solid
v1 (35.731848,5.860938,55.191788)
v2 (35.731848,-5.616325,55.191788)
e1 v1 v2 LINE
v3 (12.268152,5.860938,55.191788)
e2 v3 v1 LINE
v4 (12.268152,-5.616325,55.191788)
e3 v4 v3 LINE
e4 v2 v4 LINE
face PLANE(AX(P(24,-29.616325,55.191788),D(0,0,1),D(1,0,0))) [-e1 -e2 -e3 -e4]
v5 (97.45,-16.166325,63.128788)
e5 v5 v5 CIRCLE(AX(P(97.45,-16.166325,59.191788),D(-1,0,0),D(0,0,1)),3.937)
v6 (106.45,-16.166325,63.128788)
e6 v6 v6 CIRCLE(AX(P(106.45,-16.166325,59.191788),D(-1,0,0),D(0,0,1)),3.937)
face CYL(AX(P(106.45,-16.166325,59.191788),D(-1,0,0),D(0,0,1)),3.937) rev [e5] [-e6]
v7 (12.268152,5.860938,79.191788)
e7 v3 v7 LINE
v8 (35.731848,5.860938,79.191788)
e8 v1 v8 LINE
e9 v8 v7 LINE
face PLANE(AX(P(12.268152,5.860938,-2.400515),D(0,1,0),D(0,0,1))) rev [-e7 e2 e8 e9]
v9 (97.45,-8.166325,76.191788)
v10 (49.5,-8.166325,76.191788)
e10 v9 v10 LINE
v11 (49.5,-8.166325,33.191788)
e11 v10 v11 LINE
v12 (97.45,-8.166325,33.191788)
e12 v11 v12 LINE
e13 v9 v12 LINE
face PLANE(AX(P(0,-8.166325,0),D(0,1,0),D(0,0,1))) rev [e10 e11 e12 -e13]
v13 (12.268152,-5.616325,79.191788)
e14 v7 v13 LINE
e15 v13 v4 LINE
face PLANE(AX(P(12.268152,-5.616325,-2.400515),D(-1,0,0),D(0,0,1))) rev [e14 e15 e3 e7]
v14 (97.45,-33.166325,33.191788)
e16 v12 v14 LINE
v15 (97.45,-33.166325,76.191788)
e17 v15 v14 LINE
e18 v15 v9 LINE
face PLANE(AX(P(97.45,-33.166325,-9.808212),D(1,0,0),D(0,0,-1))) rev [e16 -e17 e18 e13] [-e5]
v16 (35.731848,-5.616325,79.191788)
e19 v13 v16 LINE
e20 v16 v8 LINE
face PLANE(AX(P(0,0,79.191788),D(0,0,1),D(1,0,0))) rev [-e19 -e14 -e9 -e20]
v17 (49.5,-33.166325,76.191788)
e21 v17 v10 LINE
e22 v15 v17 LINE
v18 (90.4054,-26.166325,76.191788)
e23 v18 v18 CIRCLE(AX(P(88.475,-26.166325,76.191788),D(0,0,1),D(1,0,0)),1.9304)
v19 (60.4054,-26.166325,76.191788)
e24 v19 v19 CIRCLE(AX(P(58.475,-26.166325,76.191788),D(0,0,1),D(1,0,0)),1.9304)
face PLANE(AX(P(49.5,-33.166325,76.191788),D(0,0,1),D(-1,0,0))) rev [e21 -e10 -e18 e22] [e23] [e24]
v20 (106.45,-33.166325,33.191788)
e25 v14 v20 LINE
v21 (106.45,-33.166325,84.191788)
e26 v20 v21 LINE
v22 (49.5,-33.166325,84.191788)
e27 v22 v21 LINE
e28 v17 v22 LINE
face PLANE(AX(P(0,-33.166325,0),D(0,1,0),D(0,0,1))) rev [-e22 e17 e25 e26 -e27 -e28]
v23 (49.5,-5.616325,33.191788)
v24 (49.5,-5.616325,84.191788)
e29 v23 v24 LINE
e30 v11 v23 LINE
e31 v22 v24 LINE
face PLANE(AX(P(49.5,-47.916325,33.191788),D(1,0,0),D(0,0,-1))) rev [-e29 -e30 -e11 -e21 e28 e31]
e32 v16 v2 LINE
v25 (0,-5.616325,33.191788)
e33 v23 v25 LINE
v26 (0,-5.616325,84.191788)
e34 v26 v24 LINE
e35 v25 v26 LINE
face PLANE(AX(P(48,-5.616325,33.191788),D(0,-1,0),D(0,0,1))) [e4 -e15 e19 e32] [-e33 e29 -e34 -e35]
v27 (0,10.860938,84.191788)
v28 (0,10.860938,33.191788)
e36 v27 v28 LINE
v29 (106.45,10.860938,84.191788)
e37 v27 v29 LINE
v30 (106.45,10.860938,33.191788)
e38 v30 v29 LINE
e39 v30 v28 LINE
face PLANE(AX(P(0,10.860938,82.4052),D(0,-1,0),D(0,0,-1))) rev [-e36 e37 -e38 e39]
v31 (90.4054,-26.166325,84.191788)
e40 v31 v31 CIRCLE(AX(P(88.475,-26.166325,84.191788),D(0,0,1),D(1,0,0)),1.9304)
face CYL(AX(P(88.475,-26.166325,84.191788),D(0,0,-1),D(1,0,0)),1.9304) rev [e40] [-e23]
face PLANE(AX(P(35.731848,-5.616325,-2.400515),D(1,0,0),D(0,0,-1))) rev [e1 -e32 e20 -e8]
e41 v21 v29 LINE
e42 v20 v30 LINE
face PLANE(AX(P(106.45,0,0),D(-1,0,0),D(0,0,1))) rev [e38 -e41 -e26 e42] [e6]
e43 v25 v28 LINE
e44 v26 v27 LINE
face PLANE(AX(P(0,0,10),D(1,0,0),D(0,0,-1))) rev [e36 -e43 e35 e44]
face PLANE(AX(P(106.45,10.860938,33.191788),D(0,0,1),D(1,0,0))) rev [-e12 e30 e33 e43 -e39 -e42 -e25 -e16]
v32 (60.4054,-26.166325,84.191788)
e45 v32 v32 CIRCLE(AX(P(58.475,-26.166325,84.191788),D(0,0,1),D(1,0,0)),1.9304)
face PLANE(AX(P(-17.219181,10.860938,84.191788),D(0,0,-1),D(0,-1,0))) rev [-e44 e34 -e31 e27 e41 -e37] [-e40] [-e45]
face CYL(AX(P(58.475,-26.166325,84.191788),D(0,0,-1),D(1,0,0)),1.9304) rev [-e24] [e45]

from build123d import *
from build123d.topology import SkipClean

# Parameters (mm, degrees)
SKETCH1_W             = 48
SKETCH1_H             = 53
BOSS_EXTRUDE1_DEPTH   = 10
SKETCH2_W             = 48
SKETCH2_H             = 5.616325
BOSS_EXTRUDE2_DEPTH   = 33.1917878
SKETCH4_W             = 4
SKETCH4_H             = 10
BOSS_EXTRUDE4_DEPTH   = 40
SKETCH5_W             = 48
SKETCH5_H             = 10.8609375
BOSS_EXTRUDE5_DEPTH   = 23.1917878
SKETCH6_W             = 48
SKETCH6_H             = 5
BOSS_EXTRUDE6_DEPTH   = 42.3
SKETCH7_W             = 12.8082122
SKETCH7_H             = 16.4772625
BOSS_EXTRUDE7_DEPTH   = 48
CUT_EXTRUDE1_REACH    = 84.426
SKETCH8_R             = 11.5
SKETCH8_R_2           = 2
FILLET1_R             = 10
FILLET2_R             = 4
SKETCH9_W             = 5
SKETCH9_H             = 16.4772625
BOSS_EXTRUDE9_DEPTH   = 48
CUT_EXTRUDE2_DEPTH    = 88.252507127
SKETCH11_W            = 51
SKETCH11_H            = 16.4772625
BOSS_EXTRUDE10_DEPTH  = 49.45
BOSS_EXTRUDE11_DEPTH  = 46
SKETCH16_W            = 47.95
SKETCH16_H            = 51
BOSS_EXTRUDE14_DEPTH  = 2.55
SKETCH14_W            = 5
SKETCH14_H            = 42.3
BOSS_EXTRUDE13_DEPTH  = 1.5
SKETCH17_W            = 51
SKETCH17_H            = 19.0272625
BOSS_EXTRUDE15_DEPTH  = 9
BOSS_EXTRUDE16_DEPTH  = 25
SKETCH19_R            = 1.9304
CUT_EXTRUDE3_DEPTH    = 125.404890183
MIRROR2_START         = 33.1917878
MIRROR2_DEPTH         = 51
MIRROR2_START_2       = 76.1917878
MIRROR2_2_OUTLINE_W   = 47.95
MIRROR2_2_OUTLINE_H   = 25
MIRROR2_2_OUTLINE_R   = 1.9304
MIRROR2_2_DEPTH       = 8
MIRROR2_3_OUTLINE_W   = 45
MIRROR2_3_OUTLINE_H   = 42.3
MIRROR2_3_OUTLINE_R   = 2
MIRROR2_3_OUTLINE_R_2 = 11.5
MIRROR2_3_DEPTH       = 5
SKETCH20_W            = 103.287975037
SKETCH20_H            = 97.84889924
CUT_EXTRUDE4_DEPTH    = 144.929961559
SKETCH21_W            = 49.5
SKETCH21_H            = 42.3
CUT_EXTRUDE5_DEPTH    = 128.391431036
SKETCH24_R            = 7.5
BOSS_EXTRUDE18_DEPTH  = 45
BOSS_EXTRUDE19_DEPTH  = 29
SKETCH26_R            = 3.937
CUT_EXTRUDE6_DEPTH    = 135.023808387
CUT_EXTRUDE7_DEPTH    = 24
CUT_EXTRUDE8_DEPTH    = 135.852601315
CUT_EXTRUDE9_REACH    = 125.734


# Read off the part's stored shape, not the designer's step: Mirror2
with BuildPart() as part:
    # Sketch1 → Boss-Extrude1 (new body)
    with BuildSketch(Plane.XY):
        with Locations((24, 26.5)):
            Rectangle(SKETCH1_W, SKETCH1_H)
    extrude(amount=BOSS_EXTRUDE1_DEPTH)

    # Sketch2 → Boss-Extrude2 (add)
    with BuildSketch(Plane(origin=(0, 0, 0), x_dir=(-1, 0, 0), z_dir=(0, 0, -1))):
        with Locations((-24, -2.8081625)):
            Rectangle(SKETCH2_W, SKETCH2_H)
    extrude(amount=-BOSS_EXTRUDE2_DEPTH)

    # Sketch4 → Boss-Extrude4 (add)
    with BuildSketch(Plane.XY.offset(10)):
        with Locations((2, 48)):
            Rectangle(SKETCH4_W, SKETCH4_H)
        with Locations((46, 48)):
            Rectangle(SKETCH4_W, SKETCH4_H)
    extrude(amount=BOSS_EXTRUDE4_DEPTH)

    # Sketch5 → Boss-Extrude5 (add)
    with BuildSketch(Plane.XY.offset(10)):
        with Locations((24, 5.43046875)):
            Rectangle(SKETCH5_W, SKETCH5_H)
    extrude(amount=BOSS_EXTRUDE5_DEPTH)

    # Sketch6 → Boss-Extrude6 (add)
    with BuildSketch(Plane.XZ.offset(5.616325)):
        with Locations((24, 30.6917878)):
            Rectangle(SKETCH6_W, SKETCH6_H)
    extrude(amount=BOSS_EXTRUDE6_DEPTH)

    # Sketch7 → Boss-Extrude7 (add)
    with BuildSketch(Plane.ZY):
        with Locations((-6.4041061, 2.62230625)):
            Rectangle(SKETCH7_W, SKETCH7_H)
    extrude(amount=-BOSS_EXTRUDE7_DEPTH)

    # Sketch8 → Cut-Extrude1 (cut, up to next)
    with BuildSketch(Plane(origin=(0, 0, 28.1917878), x_dir=(-1, 0, 0), z_dir=(0, 0, -1)), mode=Mode.PRIVATE) as cut_extrude1_sk1:
        with Locations((-24, -26.616325)):
            Circle(SKETCH8_R)
    cut_extrude1_tool1 = extrude(cut_extrude1_sk1.sketch, amount=-CUT_EXTRUDE1_REACH, mode=Mode.PRIVATE) & part.part
    # Sketch8 → Cut-Extrude1 (cut, up to next)
    with BuildSketch(Plane(origin=(0, 0, 28.1917878), x_dir=(-1, 0, 0), z_dir=(0, 0, -1)), mode=Mode.PRIVATE) as cut_extrude1_sk2:
        with Locations((-39.5, -11.116325)):
            Circle(SKETCH8_R_2)
    cut_extrude1_tool2 = extrude(cut_extrude1_sk2.sketch, amount=-CUT_EXTRUDE1_REACH, mode=Mode.PRIVATE) & part.part
    # Sketch8 → Cut-Extrude1 (cut, up to next)
    with BuildSketch(Plane(origin=(0, 0, 28.1917878), x_dir=(-1, 0, 0), z_dir=(0, 0, -1)), mode=Mode.PRIVATE) as cut_extrude1_sk3:
        with Locations((-39.5, -42.116325)):
            Circle(SKETCH8_R_2)
    cut_extrude1_tool3 = extrude(cut_extrude1_sk3.sketch, amount=-CUT_EXTRUDE1_REACH, mode=Mode.PRIVATE) & part.part
    # Sketch8 → Cut-Extrude1 (cut, up to next)
    with BuildSketch(Plane(origin=(0, 0, 28.1917878), x_dir=(-1, 0, 0), z_dir=(0, 0, -1)), mode=Mode.PRIVATE) as cut_extrude1_sk4:
        with Locations((-8.5, -11.116325)):
            Circle(SKETCH8_R_2)
    cut_extrude1_tool4 = extrude(cut_extrude1_sk4.sketch, amount=-CUT_EXTRUDE1_REACH, mode=Mode.PRIVATE) & part.part
    # Sketch8 → Cut-Extrude1 (cut, up to next)
    with BuildSketch(Plane(origin=(0, 0, 28.1917878), x_dir=(-1, 0, 0), z_dir=(0, 0, -1)), mode=Mode.PRIVATE) as cut_extrude1_sk5:
        with Locations((-8.5, -42.116325)):
            Circle(SKETCH8_R_2)
    cut_extrude1_tool5 = extrude(cut_extrude1_sk5.sketch, amount=-CUT_EXTRUDE1_REACH, mode=Mode.PRIVATE) & part.part
    add(cut_extrude1_tool1.solids().sort_by_distance((24, -26.616325, 28.191788))[0], mode=Mode.SUBTRACT)
    add(cut_extrude1_tool2.solids().sort_by_distance((39.5, -11.116325, 28.191788))[0], mode=Mode.SUBTRACT)
    add(cut_extrude1_tool3.solids().sort_by_distance((39.5, -42.116325, 28.191788))[0], mode=Mode.SUBTRACT)
    add(cut_extrude1_tool4.solids().sort_by_distance((8.5, -11.116325, 28.191788))[0], mode=Mode.SUBTRACT)
    add(cut_extrude1_tool5.solids().sort_by_distance((8.5, -42.116325, 28.191788))[0], mode=Mode.SUBTRACT)

    # Fillet1
    fillet1_edges = [part.edges().sort_by_distance(p)[0] for p in [
        (24, 10.8609375, 0),
    ]]
    fillet(fillet1_edges, radius=FILLET1_R)

    # Fillet2
    fillet2_edges = [part.edges().sort_by_distance(p)[0] for p in [
        (2, 43, 10),
        (46, 43, 10),
    ]]
    fillet(fillet2_edges, radius=FILLET2_R)

    # Sketch9 → Boss-Extrude9 (add)
    with BuildSketch(Plane(origin=(48, 0, 0), x_dir=(0, 0, -1), z_dir=(1, 0, 0))):
        with Locations((15.3082122, 2.62230625)):
            Rectangle(SKETCH9_W, SKETCH9_H)
    extrude(amount=-BOSS_EXTRUDE9_DEPTH)

    # Sketch10 → Cut-Extrude2 (cut, through all)
    with BuildSketch(Plane(origin=(48, 0, 0), x_dir=(0, 0, -1), z_dir=(1, 0, 0))):
        Polygon((17.8082122, 10.8609375), (-33.1917878, 10.8609375), (-76.887145623, 43.902095521), (-50.794096938, 74.436514195), (27.207463492, 71.105486703), align=None)
    extrude(amount=-CUT_EXTRUDE2_DEPTH, mode=Mode.SUBTRACT)

    # Sketch11 → Boss-Extrude10 (add)
    with BuildSketch(Plane(origin=(48, 0, 0), x_dir=(0, 0, -1), z_dir=(1, 0, 0))):
        with Locations((-7.6917878, 2.62230625)):
            Rectangle(SKETCH11_W, SKETCH11_H)
    extrude(amount=BOSS_EXTRUDE10_DEPTH)

    # Sketch12 → Boss-Extrude11 (add)
    with BuildSketch(Plane(origin=(0, 0, 28.1917878), x_dir=(-1, 0, 0), z_dir=(0, 0, -1))):
        Polygon((-48, -47.916325), (-45, -47.916325), (-45, -5.616325), (-49.5, -5.616325), (-49.5, -47.916325), align=None)
    extrude(amount=BOSS_EXTRUDE11_DEPTH)

    # Sketch16 → Boss-Extrude14 (add)
    with BuildSketch(Plane.XZ.offset(5.616325)):
        with Locations((73.475, 7.6917878)):
            Rectangle(SKETCH16_W, SKETCH16_H)
    extrude(amount=BOSS_EXTRUDE14_DEPTH)

    # Sketch14 → Boss-Extrude13 (add)
    with BuildSketch(Plane(origin=(49.5, 0, 0), x_dir=(0, 0, -1), z_dir=(1, 0, 0))):
        with Locations((-30.6917878, -26.766325)):
            Rectangle(SKETCH14_W, SKETCH14_H)
    extrude(amount=-BOSS_EXTRUDE13_DEPTH)

    # Sketch17 → Boss-Extrude15 (add)
    with BuildSketch(Plane(origin=(97.45, 0, 0), x_dir=(0, 0, -1), z_dir=(1, 0, 0))):
        with Locations((-7.6917878, 1.34730625)):
            Rectangle(SKETCH17_W, SKETCH17_H)
    extrude(amount=BOSS_EXTRUDE15_DEPTH)

    # Sketch18 → Boss-Extrude16 (add)
    with BuildSketch(Plane.XZ.offset(8.166325)):
        Polygon((49.5, -17.8082122), (106.45, -17.8082122), (106.45, -9.8082122), (106.45, 33.1917878), (97.45, 33.1917878), (97.45, -9.8082122), (49.5, -9.8082122), align=None)
    extrude(amount=BOSS_EXTRUDE16_DEPTH)

    # Sketch19 → Cut-Extrude3 (cut, through all)
    with BuildSketch(Plane.XY.offset(-9.8082122)):
        with Locations((58.475, -26.166325)):
            Circle(SKETCH19_R)
        with Locations((88.475, -26.166325)):
            Circle(SKETCH19_R)
    extrude(amount=-CUT_EXTRUDE3_DEPTH, mode=Mode.SUBTRACT)

    # Mirror2 outline → Mirror2 (add)
    with BuildSketch(Plane.XY.offset(MIRROR2_START)):
        Polygon((49.5, -47.916325), (49.5, -8.166325), (97.45, -8.166325), (97.45, -33.166325), (106.45, -33.166325), (106.45, 10.8609375), (0, 10.8609375), (0, -5.616325), (45, -5.616325), (45, -47.916325), align=None)
    extrude(amount=MIRROR2_DEPTH)

    # Mirror2 2 outline → Mirror2 2 (add)
    with BuildSketch(Plane.XY.offset(MIRROR2_START_2)):
        with Locations((73.475, -20.666325)):
            Rectangle(MIRROR2_2_OUTLINE_W, MIRROR2_2_OUTLINE_H)
        with Locations((58.475, -26.166325)):
            Circle(MIRROR2_2_OUTLINE_R, mode=Mode.SUBTRACT)
        with Locations((88.475, -26.166325)):
            Circle(MIRROR2_2_OUTLINE_R, mode=Mode.SUBTRACT)
    extrude(amount=MIRROR2_2_DEPTH)

    # Mirror2 3 outline → Mirror2 3 (add)
    with SkipClean():  # the faces are left unmerged after this step: merging them gives an invalid solid
        with BuildSketch(Plane.XY.offset(MIRROR2_START)):
            with Locations((22.5, -26.766325)):
                Rectangle(MIRROR2_3_OUTLINE_W, MIRROR2_3_OUTLINE_H)
            with Locations((8.5, -42.116325)):
                Circle(MIRROR2_3_OUTLINE_R, mode=Mode.SUBTRACT)
            with Locations((39.5, -42.116325)):
                Circle(MIRROR2_3_OUTLINE_R, mode=Mode.SUBTRACT)
            with Locations((24, -26.616325)):
                Circle(MIRROR2_3_OUTLINE_R_2, mode=Mode.SUBTRACT)
            with Locations((8.5, -11.116325)):
                Circle(MIRROR2_3_OUTLINE_R, mode=Mode.SUBTRACT)
            with Locations((39.5, -11.116325)):
                Circle(MIRROR2_3_OUTLINE_R, mode=Mode.SUBTRACT)
        extrude(amount=MIRROR2_3_DEPTH)

    # Sketch20 → Cut-Extrude4 (cut, through all)
    with BuildSketch(Plane.ZY):
        with Locations((-18.452199719, -38.06351212)):
            Rectangle(SKETCH20_W, SKETCH20_H)
    extrude(amount=-CUT_EXTRUDE4_DEPTH, mode=Mode.SUBTRACT)

    # Sketch21 → Cut-Extrude5 (cut, through all)
    with BuildSketch(Plane.XY.offset(84.1917878)):
        with Locations((24.75, -26.766325)):
            Rectangle(SKETCH21_W, SKETCH21_H)
    extrude(amount=-CUT_EXTRUDE5_DEPTH, mode=Mode.SUBTRACT)



with BuildPart() as body_2:
    # Sketch24 → Boss-Extrude18 (new body)
    with BuildSketch(Plane.XY.offset(55.1917878)):
        with Locations((24, -29.616325)):
            Circle(SKETCH24_R)
    extrude(amount=-BOSS_EXTRUDE18_DEPTH)


with BuildPart() as part_1:
    add(part.part)

    add(body_2.part)  # Boss-Extrude19 merges body 2
    # Sketch25 → Boss-Extrude19 (add)
    with BuildSketch(Plane.XY.offset(55.1917878)):
        with BuildLine():
            Line((16.5, -29.616325), (12.268152463, -5.616325))
            Line((12.268152463, -5.616325), (35.731847537, -5.616325))
            Line((35.731847537, -5.616325), (31.5, -29.616325))
            ThreePointArc((31.5, -29.616325), (24, -37.116325), (16.5, -29.616325))
        make_face()
    extrude(amount=BOSS_EXTRUDE19_DEPTH)

    # Sketch26 → Cut-Extrude6 (cut, through all)
    with BuildSketch(Plane.ZY.offset(-97.45)):
        with Locations((59.1917878, -16.166325)):
            Circle(SKETCH26_R)
    extrude(amount=-CUT_EXTRUDE6_DEPTH, mode=Mode.SUBTRACT)

    # Sketch27 → Cut-Extrude7 (cut)
    with BuildSketch(Plane.XY.offset(79.1917878)):
        Polygon((12.268152463, -5.616325), (12.268152463, 5.8609375), (35.731847537, 5.8609375), (35.731847537, -5.616325), (35.731847537, -46.734959709), (12.268152463, -46.734959709), align=None)
    extrude(amount=-CUT_EXTRUDE7_DEPTH, mode=Mode.SUBTRACT)


with BuildPart() as cut_extrude7_piece_1:
    # of the separate pieces the step leaves, piece 1, a body of its own (cut_extrude7_pieces)
    add(part_1.part.solids().sort_by_distance((97.45, -8.166325, 33.1917878))[0])

    # Sketch29 → Cut-Extrude9 (cut, up to next)
    with BuildSketch(Plane.XY.offset(84.1917878), mode=Mode.PRIVATE) as cut_extrude9_sk1:
        with BuildLine():
            Line((12.268152463, -5.616325), (35.731847537, -5.616325))
            Line((35.731847537, -5.616325), (31.5, -29.616325))
            ThreePointArc((31.5, -29.616325), (24, -37.116325), (16.5, -29.616325))
            Line((16.5, -29.616325), (12.268152463, -5.616325))
        make_face()
    cut_extrude9_tool1 = extrude(cut_extrude9_sk1.sketch, amount=-CUT_EXTRUDE9_REACH, mode=Mode.PRIVATE) & cut_extrude7_piece_1.part
    add(cut_extrude9_tool1.solids().sort_by_distance((24, -19.317077, 84.191788))[0], mode=Mode.SUBTRACT)


with BuildPart() as cut_extrude7_piece_2:
    # of the separate pieces the step leaves, piece 2, a body of its own (cut_extrude7_pieces)
    add(part_1.part.solids().sort_by_distance((31.5, -29.616325, 55.1917878))[0])

    # Sketch28 → Cut-Extrude8 (cut, through all)
    with BuildSketch(Plane(origin=(0, 0, 10.1917878), x_dir=(-1, 0, 0), z_dir=(0, 0, -1))):
        with BuildLine():
            Line((-31.5, -29.616325), (-35.731847537, -5.616325))
            Line((-35.731847537, -5.616325), (-12.268152463, -5.616325))
            Line((-12.268152463, -5.616325), (-16.5, -29.616325))
            ThreePointArc((-16.5, -29.616325), (-24, -37.116325), (-31.5, -29.616325))
        make_face()
    extrude(amount=-CUT_EXTRUDE8_DEPTH, mode=Mode.SUBTRACT)


solid = cut_extrude7_piece_1.part
